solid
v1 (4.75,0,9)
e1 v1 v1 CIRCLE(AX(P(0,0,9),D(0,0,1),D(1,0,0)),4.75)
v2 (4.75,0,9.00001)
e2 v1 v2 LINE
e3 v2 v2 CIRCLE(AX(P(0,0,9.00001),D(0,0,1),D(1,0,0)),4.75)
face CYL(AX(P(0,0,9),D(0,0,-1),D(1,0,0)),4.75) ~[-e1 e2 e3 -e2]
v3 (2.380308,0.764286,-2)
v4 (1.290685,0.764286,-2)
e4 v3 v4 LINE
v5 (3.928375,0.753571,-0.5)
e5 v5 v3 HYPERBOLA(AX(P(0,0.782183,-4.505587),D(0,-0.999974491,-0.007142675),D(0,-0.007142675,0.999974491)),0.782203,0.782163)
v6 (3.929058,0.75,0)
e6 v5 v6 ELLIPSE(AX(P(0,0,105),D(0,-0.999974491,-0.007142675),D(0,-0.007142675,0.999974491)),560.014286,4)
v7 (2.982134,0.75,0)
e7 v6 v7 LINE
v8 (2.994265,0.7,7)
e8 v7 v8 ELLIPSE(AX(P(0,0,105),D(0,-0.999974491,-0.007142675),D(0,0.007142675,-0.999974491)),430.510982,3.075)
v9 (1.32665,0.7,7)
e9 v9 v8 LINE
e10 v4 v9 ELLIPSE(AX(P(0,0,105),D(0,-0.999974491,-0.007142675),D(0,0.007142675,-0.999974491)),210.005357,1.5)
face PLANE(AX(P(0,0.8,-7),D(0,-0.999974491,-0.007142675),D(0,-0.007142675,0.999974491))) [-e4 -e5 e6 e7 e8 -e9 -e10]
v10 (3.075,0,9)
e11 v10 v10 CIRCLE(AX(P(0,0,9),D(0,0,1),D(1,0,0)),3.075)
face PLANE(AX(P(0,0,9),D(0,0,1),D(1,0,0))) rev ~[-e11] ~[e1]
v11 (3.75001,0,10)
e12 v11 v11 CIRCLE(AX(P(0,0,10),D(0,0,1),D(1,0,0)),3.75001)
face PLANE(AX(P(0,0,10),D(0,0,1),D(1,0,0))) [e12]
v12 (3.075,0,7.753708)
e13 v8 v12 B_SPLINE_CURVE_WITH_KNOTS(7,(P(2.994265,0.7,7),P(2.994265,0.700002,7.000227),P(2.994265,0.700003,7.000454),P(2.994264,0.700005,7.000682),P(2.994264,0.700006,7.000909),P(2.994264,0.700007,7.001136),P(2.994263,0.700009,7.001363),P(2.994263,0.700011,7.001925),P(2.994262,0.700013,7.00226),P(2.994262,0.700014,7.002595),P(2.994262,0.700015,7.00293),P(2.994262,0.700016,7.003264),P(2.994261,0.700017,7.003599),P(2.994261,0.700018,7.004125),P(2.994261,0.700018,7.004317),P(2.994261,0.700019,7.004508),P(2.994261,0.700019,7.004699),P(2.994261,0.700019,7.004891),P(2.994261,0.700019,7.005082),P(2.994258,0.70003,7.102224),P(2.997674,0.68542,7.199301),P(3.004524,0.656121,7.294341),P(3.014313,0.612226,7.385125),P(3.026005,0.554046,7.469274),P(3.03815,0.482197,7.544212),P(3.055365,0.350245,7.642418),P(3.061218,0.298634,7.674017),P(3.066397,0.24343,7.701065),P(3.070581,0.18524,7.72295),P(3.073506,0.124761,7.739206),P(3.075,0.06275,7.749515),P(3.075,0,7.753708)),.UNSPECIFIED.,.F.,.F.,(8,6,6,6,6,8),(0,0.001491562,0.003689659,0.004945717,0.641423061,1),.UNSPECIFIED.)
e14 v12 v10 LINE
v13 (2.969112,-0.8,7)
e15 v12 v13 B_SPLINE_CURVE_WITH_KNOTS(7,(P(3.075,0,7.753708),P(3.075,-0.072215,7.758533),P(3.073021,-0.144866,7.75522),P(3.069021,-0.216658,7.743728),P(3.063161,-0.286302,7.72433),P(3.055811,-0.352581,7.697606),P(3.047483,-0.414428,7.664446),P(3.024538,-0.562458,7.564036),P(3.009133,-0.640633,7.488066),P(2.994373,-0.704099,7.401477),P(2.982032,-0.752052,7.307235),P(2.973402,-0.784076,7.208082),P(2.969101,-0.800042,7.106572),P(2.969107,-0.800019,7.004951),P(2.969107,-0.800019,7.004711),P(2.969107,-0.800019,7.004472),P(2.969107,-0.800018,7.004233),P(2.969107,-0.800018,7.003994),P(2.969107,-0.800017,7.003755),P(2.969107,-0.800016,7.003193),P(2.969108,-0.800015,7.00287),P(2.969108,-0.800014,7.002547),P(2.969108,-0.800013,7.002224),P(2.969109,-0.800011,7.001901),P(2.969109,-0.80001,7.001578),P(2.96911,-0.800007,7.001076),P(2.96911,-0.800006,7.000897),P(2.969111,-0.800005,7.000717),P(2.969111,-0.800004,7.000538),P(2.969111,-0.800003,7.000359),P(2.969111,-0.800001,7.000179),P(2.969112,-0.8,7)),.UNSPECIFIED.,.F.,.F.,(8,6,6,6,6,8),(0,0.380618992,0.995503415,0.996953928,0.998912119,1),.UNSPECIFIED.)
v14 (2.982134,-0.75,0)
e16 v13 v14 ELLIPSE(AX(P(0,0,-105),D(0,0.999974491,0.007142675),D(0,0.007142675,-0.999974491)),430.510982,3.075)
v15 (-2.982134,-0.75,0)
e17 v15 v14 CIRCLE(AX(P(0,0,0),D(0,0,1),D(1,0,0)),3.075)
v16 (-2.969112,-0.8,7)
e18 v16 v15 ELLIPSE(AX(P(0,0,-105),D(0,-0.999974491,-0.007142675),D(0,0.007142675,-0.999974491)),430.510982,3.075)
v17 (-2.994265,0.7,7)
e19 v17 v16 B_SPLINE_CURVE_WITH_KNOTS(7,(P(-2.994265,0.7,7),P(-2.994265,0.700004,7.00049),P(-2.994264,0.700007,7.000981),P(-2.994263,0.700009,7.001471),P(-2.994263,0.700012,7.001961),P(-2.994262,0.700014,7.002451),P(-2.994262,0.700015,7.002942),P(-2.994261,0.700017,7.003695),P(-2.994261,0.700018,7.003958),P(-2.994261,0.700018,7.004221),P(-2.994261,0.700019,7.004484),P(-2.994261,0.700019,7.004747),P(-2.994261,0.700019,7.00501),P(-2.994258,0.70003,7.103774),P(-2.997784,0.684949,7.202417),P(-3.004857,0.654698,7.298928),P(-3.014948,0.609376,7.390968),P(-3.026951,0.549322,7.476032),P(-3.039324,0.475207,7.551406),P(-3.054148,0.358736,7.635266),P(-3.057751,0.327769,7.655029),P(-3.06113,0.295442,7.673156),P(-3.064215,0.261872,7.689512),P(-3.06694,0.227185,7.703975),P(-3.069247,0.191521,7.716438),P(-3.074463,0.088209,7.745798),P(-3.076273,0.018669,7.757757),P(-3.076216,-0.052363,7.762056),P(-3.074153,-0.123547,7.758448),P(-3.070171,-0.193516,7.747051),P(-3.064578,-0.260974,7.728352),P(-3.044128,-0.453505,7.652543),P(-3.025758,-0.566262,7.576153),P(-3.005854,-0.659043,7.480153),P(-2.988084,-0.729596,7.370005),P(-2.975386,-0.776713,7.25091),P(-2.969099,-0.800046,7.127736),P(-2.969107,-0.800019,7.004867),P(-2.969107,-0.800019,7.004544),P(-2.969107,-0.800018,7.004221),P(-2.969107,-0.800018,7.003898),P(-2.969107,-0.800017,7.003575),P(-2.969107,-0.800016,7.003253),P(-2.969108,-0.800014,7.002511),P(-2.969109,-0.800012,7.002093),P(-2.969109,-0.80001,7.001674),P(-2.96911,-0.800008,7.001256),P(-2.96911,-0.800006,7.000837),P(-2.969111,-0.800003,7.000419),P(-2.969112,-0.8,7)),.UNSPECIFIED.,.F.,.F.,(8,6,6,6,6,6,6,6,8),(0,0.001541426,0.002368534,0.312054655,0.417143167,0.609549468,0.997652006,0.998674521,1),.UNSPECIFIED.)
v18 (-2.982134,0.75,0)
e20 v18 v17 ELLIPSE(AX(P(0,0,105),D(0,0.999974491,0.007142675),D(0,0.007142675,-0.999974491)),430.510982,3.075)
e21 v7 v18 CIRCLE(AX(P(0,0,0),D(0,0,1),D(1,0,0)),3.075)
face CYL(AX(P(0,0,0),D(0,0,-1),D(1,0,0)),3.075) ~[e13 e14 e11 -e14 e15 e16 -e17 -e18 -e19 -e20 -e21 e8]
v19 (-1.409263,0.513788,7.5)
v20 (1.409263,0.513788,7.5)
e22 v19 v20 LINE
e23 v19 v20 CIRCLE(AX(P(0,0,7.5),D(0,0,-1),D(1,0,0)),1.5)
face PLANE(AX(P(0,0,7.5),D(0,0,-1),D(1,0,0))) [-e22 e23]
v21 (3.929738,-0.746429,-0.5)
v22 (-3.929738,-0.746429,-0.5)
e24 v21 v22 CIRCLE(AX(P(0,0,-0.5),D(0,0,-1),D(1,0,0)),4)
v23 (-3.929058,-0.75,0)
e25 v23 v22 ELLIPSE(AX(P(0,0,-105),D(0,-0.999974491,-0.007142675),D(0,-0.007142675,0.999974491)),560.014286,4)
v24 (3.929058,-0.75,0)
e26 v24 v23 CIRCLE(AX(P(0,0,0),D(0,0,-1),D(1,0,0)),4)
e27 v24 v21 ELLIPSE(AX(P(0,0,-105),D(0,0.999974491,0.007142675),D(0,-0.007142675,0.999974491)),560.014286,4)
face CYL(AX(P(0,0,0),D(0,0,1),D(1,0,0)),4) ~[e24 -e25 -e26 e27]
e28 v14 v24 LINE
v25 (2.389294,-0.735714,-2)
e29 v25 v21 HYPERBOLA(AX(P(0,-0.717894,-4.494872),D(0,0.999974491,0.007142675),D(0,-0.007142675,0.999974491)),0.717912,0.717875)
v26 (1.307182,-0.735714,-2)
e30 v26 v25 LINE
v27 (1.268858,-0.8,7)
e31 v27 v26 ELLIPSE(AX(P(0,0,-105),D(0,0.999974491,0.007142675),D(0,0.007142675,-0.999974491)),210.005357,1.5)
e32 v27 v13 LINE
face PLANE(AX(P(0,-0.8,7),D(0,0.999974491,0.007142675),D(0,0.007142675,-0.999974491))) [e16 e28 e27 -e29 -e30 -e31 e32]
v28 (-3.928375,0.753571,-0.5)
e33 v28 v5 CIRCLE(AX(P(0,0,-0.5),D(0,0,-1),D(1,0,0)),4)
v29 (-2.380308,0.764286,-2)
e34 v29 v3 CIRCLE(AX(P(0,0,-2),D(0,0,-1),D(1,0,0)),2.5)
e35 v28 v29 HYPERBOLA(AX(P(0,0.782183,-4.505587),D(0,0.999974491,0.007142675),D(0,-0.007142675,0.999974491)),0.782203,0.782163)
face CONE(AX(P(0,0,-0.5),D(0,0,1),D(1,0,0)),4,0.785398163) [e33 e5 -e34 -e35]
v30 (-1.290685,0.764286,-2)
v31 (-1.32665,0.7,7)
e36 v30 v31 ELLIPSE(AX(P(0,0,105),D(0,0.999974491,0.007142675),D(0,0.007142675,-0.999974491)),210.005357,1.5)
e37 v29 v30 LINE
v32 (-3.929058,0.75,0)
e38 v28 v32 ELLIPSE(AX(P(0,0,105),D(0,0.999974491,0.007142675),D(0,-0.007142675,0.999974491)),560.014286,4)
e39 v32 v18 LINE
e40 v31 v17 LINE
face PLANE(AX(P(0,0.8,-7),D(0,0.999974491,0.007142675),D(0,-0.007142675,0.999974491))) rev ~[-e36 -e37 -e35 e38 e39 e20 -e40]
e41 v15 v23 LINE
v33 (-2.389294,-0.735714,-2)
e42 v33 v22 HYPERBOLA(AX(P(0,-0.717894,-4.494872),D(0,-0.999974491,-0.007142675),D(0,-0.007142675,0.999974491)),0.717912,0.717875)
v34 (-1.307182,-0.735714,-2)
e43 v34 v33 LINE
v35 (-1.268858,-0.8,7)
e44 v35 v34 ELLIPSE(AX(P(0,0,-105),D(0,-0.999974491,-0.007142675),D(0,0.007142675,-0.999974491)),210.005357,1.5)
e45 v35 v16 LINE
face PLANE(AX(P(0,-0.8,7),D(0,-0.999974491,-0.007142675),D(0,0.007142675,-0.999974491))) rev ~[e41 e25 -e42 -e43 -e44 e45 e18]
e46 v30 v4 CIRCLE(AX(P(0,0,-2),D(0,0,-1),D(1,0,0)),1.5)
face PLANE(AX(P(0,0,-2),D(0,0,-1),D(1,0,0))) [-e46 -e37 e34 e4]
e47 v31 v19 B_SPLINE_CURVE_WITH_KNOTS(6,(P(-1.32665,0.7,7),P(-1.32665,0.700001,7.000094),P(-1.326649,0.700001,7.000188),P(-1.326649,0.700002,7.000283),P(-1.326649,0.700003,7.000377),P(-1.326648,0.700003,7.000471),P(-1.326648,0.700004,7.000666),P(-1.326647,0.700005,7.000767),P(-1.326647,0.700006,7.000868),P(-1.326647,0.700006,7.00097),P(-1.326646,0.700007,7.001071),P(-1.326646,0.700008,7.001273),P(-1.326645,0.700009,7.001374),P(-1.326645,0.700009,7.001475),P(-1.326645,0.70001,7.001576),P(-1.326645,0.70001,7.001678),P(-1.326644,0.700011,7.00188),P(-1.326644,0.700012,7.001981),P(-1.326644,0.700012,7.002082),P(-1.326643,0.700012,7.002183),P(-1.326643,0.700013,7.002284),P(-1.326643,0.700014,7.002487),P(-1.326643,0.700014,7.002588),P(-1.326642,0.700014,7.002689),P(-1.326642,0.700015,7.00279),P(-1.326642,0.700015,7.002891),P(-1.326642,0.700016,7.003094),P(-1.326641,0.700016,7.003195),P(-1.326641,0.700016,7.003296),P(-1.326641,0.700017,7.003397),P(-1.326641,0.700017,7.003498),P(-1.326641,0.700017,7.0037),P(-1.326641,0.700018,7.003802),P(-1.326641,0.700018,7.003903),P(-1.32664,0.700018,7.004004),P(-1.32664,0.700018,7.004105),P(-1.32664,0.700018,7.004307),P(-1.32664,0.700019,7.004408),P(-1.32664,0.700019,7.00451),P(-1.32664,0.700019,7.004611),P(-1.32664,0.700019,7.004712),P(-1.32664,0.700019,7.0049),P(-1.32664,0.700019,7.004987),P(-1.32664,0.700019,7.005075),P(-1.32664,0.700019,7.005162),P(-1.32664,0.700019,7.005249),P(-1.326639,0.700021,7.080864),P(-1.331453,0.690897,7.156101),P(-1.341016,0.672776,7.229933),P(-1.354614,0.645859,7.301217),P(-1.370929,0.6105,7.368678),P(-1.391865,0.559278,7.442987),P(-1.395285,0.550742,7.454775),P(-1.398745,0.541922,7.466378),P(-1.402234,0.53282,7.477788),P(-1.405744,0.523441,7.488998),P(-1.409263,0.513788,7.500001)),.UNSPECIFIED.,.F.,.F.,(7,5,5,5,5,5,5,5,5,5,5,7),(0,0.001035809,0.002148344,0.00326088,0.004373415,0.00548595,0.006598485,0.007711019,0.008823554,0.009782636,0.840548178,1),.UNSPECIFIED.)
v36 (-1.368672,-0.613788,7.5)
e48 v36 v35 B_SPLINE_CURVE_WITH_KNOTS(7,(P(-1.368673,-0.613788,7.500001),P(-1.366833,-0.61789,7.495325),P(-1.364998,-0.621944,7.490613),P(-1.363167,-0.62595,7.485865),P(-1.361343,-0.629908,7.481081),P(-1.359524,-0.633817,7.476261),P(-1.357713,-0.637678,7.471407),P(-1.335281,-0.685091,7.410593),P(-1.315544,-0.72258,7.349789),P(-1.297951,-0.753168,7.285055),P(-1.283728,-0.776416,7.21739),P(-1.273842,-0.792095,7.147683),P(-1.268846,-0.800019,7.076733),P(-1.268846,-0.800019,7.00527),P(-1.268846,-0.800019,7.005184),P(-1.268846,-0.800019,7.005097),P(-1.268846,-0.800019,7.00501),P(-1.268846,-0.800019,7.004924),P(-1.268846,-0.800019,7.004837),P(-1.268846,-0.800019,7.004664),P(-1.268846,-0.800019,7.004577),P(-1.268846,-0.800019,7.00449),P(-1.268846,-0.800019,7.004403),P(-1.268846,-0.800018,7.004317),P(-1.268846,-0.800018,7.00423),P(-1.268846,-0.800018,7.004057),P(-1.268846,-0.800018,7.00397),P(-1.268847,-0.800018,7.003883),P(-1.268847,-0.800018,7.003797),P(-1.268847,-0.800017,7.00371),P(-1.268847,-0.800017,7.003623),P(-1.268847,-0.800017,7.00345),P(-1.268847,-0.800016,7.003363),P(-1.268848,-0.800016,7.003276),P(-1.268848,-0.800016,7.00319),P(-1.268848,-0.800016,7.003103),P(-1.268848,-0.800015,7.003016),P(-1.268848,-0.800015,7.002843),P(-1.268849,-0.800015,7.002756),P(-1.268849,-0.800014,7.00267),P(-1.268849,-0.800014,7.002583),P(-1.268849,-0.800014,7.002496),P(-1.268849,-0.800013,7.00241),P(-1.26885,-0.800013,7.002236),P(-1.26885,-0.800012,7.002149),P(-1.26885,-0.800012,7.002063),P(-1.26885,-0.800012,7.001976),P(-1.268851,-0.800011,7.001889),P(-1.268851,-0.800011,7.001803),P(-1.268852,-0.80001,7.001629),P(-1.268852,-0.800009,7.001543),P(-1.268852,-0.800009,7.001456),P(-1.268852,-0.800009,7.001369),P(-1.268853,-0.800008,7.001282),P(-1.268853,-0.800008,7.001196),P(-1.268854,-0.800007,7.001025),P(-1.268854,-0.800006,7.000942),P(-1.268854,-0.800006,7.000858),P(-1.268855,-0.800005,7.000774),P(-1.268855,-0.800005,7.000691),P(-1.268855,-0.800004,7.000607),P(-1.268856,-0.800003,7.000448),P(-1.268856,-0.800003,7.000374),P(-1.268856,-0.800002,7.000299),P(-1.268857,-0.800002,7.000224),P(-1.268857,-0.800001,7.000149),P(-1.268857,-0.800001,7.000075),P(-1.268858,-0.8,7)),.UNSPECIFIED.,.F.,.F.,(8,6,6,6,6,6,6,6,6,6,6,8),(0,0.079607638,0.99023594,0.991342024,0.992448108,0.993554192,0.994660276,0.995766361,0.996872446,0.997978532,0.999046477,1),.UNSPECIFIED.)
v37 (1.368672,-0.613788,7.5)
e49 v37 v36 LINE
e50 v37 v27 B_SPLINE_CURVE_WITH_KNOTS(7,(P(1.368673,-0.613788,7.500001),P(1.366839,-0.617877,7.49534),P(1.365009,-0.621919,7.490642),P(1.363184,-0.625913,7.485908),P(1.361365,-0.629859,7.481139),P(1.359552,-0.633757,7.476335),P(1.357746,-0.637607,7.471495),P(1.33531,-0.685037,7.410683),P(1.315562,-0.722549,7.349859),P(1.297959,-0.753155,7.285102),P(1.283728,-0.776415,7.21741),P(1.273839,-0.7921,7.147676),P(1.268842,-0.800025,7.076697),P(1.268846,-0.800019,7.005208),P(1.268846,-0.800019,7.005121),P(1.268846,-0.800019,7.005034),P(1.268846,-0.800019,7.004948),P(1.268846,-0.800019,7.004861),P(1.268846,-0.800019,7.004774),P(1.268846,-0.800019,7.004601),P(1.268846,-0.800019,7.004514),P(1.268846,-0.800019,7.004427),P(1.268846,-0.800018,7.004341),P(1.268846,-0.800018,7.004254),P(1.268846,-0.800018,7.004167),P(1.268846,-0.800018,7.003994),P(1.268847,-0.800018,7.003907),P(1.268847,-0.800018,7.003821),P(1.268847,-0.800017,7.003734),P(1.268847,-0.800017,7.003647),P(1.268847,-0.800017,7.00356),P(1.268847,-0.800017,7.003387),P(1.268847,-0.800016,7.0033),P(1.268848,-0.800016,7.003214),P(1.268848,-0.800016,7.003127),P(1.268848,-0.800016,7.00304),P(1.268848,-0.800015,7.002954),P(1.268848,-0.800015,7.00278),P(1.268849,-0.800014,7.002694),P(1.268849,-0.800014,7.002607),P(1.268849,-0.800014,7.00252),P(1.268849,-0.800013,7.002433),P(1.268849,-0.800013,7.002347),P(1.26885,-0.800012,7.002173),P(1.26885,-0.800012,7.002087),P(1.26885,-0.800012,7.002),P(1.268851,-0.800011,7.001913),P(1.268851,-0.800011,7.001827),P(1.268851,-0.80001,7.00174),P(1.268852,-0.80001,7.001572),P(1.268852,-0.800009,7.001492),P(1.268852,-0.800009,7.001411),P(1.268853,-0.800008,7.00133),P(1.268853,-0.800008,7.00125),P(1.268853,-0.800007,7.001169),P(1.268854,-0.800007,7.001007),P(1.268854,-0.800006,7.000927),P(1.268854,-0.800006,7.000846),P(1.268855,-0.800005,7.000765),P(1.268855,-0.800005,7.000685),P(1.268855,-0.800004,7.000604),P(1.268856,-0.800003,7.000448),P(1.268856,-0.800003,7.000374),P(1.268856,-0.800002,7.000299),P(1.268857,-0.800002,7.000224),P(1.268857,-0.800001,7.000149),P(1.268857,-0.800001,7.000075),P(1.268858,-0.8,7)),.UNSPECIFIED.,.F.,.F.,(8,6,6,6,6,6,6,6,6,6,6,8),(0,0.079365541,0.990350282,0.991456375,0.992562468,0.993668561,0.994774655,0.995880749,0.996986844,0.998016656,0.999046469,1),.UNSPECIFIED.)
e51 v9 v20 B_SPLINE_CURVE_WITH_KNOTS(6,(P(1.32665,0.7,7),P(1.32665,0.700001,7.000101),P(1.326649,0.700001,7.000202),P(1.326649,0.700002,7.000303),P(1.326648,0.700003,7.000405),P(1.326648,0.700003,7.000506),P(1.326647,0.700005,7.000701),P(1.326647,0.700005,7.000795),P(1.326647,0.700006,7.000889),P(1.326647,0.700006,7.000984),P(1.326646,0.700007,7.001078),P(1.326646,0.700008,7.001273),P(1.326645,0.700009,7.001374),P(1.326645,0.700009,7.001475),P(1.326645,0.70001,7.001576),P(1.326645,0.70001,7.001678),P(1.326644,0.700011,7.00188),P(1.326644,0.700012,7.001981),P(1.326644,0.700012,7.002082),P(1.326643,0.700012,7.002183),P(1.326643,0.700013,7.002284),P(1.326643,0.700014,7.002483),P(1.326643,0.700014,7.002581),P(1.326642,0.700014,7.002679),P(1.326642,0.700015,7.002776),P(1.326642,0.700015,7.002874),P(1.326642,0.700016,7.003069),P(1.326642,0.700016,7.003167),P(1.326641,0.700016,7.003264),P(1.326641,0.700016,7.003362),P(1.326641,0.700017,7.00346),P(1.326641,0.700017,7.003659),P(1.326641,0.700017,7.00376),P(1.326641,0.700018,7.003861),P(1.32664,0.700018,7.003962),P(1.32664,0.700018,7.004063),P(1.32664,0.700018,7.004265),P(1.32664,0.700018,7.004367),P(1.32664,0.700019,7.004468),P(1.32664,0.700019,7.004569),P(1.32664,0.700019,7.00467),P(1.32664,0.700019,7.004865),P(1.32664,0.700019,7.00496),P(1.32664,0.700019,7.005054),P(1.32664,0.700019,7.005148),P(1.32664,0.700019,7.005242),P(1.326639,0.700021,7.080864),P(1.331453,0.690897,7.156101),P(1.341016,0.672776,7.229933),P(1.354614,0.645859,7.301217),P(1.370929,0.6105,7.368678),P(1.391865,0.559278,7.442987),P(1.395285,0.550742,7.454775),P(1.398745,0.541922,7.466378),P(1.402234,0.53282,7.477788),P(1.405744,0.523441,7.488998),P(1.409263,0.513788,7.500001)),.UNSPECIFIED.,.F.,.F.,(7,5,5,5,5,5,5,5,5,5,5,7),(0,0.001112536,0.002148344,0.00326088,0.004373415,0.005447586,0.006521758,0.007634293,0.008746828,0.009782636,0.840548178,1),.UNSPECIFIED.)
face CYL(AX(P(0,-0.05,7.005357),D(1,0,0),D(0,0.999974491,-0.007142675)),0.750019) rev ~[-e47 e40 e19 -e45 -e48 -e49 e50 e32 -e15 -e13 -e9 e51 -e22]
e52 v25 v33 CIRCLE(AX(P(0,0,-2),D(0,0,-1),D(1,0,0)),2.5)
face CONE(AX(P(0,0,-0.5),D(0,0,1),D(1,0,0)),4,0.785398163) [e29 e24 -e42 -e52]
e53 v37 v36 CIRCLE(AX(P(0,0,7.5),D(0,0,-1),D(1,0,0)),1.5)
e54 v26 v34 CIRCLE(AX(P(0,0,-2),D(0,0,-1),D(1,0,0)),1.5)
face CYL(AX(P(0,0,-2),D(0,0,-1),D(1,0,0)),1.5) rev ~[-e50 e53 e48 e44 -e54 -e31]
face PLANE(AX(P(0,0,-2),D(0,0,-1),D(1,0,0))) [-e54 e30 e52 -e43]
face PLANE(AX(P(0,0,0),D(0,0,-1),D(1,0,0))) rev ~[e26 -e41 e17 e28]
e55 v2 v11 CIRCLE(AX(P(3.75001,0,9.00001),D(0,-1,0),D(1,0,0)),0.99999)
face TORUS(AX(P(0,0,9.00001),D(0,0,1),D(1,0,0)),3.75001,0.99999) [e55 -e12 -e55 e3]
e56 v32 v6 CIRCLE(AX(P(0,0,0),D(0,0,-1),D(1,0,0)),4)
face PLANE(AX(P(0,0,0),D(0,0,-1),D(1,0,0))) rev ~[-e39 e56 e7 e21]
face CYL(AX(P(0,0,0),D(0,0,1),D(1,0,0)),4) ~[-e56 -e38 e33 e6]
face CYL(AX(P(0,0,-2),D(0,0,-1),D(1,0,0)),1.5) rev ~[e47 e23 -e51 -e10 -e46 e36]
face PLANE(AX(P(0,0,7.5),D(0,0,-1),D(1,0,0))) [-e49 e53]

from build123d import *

# Parameters (mm, degrees)
F0_R           = 3.075
F1_DEPTH       = 9
F2_R           = 4.75
F2_R_2         = 3.075
F3_DEPTH       = 1
F4_R           = 0.99999
F5_R           = 4
F5_R_2         = 3.075
F6_DEPTH       = 2
F7_SIZE        = 1.5
F8_R           = 1.5
F9_DEPTH       = 9.5
F11_DEPTH      = 25
F11_DEPTH_BACK = 25


# Not quite as in the source:
# - a fillet or chamfer is up to 0.001 mm smaller than in the source, because OpenCascade refuses the exact size


with BuildPart() as f1:
    # F0 (on Top) → F1 (new body)
    with BuildSketch(Plane.XY):
        Circle(F0_R)
    extrude(amount=F1_DEPTH)

    # F2 (on face) → F3 (join)
    with BuildSketch(Plane.XY.offset(9)):
        Circle(F2_R)
        Circle(F2_R_2, mode=Mode.SUBTRACT)
        Circle(F2_R_2)
    extrude(amount=F3_DEPTH)

    # F4 (radius 1 in the source; OpenCascade refuses exactly that, so slightly less here)
    f4_edges = [f1.edges().sort_by_distance(p)[0] for p in [
        (-4.75, 0, 10),
    ]]
    fillet(f4_edges, radius=F4_R)

    # F5 (on face) → F6 (join)
    with BuildSketch(Plane(origin=(0, 0, 0), x_dir=(1, 0, 0), z_dir=(0, 0, -1))):
        Circle(F5_R)
        Circle(F5_R_2, mode=Mode.SUBTRACT)
        Circle(F5_R_2)
    extrude(amount=F6_DEPTH)

    # F7
    f7_edges = [f1.edges().sort_by_distance(p)[0] for p in [
        (-4, 0, -2),
    ]]
    chamfer(f7_edges, length=F7_SIZE)

    # F8 (on face) → F9 (cut)
    with BuildSketch(Plane(origin=(0, 0, -2), x_dir=(1, 0, 0), z_dir=(0, 0, -1))):
        Circle(F8_R)
    extrude(amount=-F9_DEPTH, mode=Mode.SUBTRACT)

    # F10 (on Right) → F11 (cut, two sides)
    with BuildSketch(Plane.YZ) as f11_sk:
        with BuildLine():
            Line((-0.7, -7), (0.8, -7))
            Line((0.8, -7), (0.7, 7))
            ThreePointArc((0.7, 7), (-0.05, 7.7553762753), (-0.8, 7))
            Line((-0.8, 7), (-0.7, -7))
        make_face()
    extrude(amount=F11_DEPTH, mode=Mode.SUBTRACT)
    extrude(f11_sk.sketch, amount=-F11_DEPTH_BACK, mode=Mode.SUBTRACT)


solid = f1.part
